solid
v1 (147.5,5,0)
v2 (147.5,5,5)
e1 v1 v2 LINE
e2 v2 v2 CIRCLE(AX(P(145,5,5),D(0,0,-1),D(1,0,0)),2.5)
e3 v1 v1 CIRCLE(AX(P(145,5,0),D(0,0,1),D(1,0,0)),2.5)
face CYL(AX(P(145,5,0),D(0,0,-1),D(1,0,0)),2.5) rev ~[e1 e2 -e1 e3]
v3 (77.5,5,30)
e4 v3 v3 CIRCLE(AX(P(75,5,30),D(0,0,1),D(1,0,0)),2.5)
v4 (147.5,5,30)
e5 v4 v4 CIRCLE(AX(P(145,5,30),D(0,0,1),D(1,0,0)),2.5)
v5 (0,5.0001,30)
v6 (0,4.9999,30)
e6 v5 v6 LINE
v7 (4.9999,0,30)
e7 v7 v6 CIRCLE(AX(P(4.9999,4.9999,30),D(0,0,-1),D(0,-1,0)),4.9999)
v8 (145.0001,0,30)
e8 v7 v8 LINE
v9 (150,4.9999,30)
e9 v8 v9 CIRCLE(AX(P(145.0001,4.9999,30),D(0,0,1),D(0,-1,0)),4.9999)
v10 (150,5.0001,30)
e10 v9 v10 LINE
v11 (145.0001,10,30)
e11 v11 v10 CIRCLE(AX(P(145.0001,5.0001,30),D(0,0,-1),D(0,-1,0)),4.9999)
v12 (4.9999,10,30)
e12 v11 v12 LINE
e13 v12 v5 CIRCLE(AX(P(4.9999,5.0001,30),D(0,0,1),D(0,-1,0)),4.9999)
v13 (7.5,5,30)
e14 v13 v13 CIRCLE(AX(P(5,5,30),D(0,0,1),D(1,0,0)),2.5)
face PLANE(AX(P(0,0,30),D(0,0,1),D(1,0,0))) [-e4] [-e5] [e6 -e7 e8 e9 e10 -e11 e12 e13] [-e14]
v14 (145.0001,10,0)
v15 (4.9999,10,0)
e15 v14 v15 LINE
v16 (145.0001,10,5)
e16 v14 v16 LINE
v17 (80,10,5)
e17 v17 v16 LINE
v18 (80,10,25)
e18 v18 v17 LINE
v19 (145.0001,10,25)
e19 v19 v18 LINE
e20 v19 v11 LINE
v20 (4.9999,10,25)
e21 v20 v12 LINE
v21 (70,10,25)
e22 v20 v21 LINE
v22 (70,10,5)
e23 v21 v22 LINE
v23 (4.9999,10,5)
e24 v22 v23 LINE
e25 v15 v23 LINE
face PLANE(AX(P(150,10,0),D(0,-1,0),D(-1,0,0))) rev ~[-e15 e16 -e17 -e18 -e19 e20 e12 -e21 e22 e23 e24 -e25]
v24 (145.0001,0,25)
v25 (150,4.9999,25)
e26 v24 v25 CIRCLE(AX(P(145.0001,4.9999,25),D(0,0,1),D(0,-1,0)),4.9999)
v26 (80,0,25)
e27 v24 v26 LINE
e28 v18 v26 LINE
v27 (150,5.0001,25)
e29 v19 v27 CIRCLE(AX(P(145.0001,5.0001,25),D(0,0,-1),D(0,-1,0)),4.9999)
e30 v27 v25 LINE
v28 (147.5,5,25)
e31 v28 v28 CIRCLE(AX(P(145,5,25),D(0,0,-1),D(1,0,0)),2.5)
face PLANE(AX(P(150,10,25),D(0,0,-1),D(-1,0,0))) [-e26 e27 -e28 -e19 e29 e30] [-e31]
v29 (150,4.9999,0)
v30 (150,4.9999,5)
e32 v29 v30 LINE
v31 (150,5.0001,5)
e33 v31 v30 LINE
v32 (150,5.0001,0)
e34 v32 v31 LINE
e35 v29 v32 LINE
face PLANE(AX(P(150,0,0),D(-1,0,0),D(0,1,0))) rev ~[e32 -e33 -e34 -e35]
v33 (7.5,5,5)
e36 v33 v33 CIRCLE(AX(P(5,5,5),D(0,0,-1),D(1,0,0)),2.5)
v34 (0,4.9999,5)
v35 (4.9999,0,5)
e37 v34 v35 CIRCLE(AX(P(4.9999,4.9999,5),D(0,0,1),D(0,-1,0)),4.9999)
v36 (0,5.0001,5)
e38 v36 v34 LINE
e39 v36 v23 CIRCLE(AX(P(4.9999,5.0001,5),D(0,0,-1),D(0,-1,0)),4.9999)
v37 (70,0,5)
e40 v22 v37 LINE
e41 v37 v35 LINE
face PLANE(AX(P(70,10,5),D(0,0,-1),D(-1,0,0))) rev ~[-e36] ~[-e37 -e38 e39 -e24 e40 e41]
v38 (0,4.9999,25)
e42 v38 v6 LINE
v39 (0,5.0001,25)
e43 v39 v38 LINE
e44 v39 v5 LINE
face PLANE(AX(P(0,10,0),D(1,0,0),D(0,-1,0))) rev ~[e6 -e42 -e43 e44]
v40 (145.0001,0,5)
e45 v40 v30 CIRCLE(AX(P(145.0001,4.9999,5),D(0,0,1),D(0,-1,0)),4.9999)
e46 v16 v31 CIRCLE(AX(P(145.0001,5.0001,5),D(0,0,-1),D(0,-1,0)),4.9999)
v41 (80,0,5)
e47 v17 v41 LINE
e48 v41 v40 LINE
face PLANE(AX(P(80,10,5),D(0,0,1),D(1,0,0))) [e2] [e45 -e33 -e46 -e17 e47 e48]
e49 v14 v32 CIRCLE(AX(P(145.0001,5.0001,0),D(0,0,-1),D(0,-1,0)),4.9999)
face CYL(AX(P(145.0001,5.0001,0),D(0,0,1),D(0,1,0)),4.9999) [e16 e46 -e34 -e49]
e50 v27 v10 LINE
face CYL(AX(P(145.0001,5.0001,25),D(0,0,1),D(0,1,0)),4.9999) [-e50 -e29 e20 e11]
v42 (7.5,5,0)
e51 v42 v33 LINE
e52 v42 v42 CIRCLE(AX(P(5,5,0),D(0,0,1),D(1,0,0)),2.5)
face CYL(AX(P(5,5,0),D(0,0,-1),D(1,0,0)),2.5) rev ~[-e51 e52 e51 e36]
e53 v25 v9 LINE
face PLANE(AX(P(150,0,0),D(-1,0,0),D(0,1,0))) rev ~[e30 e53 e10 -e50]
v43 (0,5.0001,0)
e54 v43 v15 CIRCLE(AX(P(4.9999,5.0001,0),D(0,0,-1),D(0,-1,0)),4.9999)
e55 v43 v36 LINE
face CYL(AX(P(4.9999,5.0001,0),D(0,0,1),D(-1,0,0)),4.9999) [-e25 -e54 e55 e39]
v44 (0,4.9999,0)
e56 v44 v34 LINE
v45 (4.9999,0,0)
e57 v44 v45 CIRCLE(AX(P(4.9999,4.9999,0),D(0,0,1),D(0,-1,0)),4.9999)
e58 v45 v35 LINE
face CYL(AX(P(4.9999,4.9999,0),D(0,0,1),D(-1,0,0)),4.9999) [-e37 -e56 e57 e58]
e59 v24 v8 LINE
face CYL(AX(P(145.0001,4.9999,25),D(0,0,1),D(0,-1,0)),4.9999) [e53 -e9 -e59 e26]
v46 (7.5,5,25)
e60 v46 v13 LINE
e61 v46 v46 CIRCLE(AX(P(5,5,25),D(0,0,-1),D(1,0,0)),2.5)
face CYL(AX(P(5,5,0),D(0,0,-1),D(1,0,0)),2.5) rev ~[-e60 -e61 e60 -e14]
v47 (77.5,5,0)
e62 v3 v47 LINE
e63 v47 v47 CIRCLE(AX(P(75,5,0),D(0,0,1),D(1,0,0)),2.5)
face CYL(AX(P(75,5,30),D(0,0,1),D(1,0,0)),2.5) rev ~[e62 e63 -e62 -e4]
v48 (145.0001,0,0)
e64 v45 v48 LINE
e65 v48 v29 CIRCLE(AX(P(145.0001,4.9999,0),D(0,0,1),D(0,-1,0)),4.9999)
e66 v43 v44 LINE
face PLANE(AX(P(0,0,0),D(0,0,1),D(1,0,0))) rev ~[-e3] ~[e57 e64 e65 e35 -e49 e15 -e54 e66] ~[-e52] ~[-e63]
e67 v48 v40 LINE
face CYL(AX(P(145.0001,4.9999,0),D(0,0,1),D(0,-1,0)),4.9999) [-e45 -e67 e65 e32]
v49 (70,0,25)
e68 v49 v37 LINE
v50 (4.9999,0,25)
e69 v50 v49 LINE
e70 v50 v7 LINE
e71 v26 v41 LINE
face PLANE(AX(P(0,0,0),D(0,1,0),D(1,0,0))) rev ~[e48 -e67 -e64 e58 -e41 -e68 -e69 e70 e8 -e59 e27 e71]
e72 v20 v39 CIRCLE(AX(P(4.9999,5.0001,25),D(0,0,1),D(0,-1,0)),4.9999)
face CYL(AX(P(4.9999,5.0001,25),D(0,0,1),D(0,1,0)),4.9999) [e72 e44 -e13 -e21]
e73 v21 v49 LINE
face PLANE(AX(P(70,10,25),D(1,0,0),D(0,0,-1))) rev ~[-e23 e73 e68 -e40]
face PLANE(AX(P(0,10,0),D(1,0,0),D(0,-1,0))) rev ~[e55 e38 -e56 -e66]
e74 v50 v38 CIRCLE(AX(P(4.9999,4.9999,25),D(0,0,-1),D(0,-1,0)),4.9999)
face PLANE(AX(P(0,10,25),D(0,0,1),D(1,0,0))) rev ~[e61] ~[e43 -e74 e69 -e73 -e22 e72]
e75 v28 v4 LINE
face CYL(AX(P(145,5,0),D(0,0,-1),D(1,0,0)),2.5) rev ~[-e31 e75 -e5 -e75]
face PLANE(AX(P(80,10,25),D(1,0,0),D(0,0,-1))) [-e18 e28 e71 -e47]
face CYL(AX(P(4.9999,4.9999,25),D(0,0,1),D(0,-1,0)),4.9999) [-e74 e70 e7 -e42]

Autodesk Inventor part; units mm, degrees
ref_plane "YZ Plane" through (0, 0, 0) normal (1, 0, 0) x (0, 1, 0)
ref_plane "XZ Plane" through (0, 0, 0) normal (0, 1, 0) x (-1, 0, 0)
ref_plane "XY Plane" through (0, 0, 0) normal (0, 0, 1) x (1, 0, 0)
sketch "Sketch1" plane through (0, 0, 0) normal (0, 0, 1) x (1, 0, 0)
  line L0 (0, 0) -> (150, 0)
  line L1 (150, 0) -> (150, 10)
  line L2 (150, 10) -> (0, 10)
  line L3 (0, 10) -> (0, 0)
  circle A0 centre (5, 5) radius 2.5
  circle A1 centre (145, 5) radius 2.5
  dimension "d0" = 5
  dimension "d1" = 5
  dimension "d2" = 10
  dimension "d3" = 5
  dimension "d4" = 150
  dimension "d5" = 5
  dimension "d6" = 5
  dimension "d7" = 5
extrude "Extrusion1" add sketch "Sketch1" along normal blind 30
sketch "Sketch2" plane through (0, 10, 0) normal (0, 1, 0) x (1, 0, 0)
  point P0 (0, 0)
sketch "Sketch3" plane through (0, 10, 0) normal (0, 1, 0) x (1, 0, 0)
  line L0 (0, 0) -> (0, -30) projected
  line L1 (0, -25) -> (70, -25)
  line L2 (70, -25) -> (70, -5)
  line L3 (70, -5) -> (0, -5)
  line L4 (0, -5) -> (0, -25)
  line L5 (150, 0) -> (150, -30) projected
  line L6 (150, -25) -> (80, -25)
  line L7 (80, -25) -> (80, -5)
  line L8 (80, -5) -> (150, -5)
  line L9 (150, -5) -> (150, -25)
  line L10 (150, 0) -> (0, 0) projected
  line L11 (150, -30) -> (0, -30) projected
  point P0 (0, -5)
  dimension "d10" = 70
  dimension "d11" = 70
  dimension "d12" = 5
  dimension "d13" = 5
  dimension "d14" = 5
  dimension "d15" = 5
extrude "Extrusion2" cut sketch "Sketch3" against normal blind 10 contours L3 L2 L1 L0 | L5 L6 L7 L8
fillet "Fillet1" radius 5 8 edges at (0, 10, 27.5) (150, 10, 27.5) (150, 10, 2.5) (0, 10, 2.5) (150, 0, 27.5) (150, 0, 2.5) (0, 0, 27.5) (0, 0, 2.5)
sketch "Sketch4" plane through (0, 0, 30) normal (0, 0, 1) x (1, 0, 0)
  circle A0 centre (75, 5) radius 2.5
  line L0 (5, 0) -> (145, 0) projected
  circle A1 centre (5, 5) radius 2.5 projected
  point P0 (0, 0)
  dimension "d19" = 5
  dimension "d20" = 5
  dimension "d21" = 70
extrude "Extrusion3" cut sketch "Sketch4" against normal blind 30 contours A0
properties part number "Joint 1"
